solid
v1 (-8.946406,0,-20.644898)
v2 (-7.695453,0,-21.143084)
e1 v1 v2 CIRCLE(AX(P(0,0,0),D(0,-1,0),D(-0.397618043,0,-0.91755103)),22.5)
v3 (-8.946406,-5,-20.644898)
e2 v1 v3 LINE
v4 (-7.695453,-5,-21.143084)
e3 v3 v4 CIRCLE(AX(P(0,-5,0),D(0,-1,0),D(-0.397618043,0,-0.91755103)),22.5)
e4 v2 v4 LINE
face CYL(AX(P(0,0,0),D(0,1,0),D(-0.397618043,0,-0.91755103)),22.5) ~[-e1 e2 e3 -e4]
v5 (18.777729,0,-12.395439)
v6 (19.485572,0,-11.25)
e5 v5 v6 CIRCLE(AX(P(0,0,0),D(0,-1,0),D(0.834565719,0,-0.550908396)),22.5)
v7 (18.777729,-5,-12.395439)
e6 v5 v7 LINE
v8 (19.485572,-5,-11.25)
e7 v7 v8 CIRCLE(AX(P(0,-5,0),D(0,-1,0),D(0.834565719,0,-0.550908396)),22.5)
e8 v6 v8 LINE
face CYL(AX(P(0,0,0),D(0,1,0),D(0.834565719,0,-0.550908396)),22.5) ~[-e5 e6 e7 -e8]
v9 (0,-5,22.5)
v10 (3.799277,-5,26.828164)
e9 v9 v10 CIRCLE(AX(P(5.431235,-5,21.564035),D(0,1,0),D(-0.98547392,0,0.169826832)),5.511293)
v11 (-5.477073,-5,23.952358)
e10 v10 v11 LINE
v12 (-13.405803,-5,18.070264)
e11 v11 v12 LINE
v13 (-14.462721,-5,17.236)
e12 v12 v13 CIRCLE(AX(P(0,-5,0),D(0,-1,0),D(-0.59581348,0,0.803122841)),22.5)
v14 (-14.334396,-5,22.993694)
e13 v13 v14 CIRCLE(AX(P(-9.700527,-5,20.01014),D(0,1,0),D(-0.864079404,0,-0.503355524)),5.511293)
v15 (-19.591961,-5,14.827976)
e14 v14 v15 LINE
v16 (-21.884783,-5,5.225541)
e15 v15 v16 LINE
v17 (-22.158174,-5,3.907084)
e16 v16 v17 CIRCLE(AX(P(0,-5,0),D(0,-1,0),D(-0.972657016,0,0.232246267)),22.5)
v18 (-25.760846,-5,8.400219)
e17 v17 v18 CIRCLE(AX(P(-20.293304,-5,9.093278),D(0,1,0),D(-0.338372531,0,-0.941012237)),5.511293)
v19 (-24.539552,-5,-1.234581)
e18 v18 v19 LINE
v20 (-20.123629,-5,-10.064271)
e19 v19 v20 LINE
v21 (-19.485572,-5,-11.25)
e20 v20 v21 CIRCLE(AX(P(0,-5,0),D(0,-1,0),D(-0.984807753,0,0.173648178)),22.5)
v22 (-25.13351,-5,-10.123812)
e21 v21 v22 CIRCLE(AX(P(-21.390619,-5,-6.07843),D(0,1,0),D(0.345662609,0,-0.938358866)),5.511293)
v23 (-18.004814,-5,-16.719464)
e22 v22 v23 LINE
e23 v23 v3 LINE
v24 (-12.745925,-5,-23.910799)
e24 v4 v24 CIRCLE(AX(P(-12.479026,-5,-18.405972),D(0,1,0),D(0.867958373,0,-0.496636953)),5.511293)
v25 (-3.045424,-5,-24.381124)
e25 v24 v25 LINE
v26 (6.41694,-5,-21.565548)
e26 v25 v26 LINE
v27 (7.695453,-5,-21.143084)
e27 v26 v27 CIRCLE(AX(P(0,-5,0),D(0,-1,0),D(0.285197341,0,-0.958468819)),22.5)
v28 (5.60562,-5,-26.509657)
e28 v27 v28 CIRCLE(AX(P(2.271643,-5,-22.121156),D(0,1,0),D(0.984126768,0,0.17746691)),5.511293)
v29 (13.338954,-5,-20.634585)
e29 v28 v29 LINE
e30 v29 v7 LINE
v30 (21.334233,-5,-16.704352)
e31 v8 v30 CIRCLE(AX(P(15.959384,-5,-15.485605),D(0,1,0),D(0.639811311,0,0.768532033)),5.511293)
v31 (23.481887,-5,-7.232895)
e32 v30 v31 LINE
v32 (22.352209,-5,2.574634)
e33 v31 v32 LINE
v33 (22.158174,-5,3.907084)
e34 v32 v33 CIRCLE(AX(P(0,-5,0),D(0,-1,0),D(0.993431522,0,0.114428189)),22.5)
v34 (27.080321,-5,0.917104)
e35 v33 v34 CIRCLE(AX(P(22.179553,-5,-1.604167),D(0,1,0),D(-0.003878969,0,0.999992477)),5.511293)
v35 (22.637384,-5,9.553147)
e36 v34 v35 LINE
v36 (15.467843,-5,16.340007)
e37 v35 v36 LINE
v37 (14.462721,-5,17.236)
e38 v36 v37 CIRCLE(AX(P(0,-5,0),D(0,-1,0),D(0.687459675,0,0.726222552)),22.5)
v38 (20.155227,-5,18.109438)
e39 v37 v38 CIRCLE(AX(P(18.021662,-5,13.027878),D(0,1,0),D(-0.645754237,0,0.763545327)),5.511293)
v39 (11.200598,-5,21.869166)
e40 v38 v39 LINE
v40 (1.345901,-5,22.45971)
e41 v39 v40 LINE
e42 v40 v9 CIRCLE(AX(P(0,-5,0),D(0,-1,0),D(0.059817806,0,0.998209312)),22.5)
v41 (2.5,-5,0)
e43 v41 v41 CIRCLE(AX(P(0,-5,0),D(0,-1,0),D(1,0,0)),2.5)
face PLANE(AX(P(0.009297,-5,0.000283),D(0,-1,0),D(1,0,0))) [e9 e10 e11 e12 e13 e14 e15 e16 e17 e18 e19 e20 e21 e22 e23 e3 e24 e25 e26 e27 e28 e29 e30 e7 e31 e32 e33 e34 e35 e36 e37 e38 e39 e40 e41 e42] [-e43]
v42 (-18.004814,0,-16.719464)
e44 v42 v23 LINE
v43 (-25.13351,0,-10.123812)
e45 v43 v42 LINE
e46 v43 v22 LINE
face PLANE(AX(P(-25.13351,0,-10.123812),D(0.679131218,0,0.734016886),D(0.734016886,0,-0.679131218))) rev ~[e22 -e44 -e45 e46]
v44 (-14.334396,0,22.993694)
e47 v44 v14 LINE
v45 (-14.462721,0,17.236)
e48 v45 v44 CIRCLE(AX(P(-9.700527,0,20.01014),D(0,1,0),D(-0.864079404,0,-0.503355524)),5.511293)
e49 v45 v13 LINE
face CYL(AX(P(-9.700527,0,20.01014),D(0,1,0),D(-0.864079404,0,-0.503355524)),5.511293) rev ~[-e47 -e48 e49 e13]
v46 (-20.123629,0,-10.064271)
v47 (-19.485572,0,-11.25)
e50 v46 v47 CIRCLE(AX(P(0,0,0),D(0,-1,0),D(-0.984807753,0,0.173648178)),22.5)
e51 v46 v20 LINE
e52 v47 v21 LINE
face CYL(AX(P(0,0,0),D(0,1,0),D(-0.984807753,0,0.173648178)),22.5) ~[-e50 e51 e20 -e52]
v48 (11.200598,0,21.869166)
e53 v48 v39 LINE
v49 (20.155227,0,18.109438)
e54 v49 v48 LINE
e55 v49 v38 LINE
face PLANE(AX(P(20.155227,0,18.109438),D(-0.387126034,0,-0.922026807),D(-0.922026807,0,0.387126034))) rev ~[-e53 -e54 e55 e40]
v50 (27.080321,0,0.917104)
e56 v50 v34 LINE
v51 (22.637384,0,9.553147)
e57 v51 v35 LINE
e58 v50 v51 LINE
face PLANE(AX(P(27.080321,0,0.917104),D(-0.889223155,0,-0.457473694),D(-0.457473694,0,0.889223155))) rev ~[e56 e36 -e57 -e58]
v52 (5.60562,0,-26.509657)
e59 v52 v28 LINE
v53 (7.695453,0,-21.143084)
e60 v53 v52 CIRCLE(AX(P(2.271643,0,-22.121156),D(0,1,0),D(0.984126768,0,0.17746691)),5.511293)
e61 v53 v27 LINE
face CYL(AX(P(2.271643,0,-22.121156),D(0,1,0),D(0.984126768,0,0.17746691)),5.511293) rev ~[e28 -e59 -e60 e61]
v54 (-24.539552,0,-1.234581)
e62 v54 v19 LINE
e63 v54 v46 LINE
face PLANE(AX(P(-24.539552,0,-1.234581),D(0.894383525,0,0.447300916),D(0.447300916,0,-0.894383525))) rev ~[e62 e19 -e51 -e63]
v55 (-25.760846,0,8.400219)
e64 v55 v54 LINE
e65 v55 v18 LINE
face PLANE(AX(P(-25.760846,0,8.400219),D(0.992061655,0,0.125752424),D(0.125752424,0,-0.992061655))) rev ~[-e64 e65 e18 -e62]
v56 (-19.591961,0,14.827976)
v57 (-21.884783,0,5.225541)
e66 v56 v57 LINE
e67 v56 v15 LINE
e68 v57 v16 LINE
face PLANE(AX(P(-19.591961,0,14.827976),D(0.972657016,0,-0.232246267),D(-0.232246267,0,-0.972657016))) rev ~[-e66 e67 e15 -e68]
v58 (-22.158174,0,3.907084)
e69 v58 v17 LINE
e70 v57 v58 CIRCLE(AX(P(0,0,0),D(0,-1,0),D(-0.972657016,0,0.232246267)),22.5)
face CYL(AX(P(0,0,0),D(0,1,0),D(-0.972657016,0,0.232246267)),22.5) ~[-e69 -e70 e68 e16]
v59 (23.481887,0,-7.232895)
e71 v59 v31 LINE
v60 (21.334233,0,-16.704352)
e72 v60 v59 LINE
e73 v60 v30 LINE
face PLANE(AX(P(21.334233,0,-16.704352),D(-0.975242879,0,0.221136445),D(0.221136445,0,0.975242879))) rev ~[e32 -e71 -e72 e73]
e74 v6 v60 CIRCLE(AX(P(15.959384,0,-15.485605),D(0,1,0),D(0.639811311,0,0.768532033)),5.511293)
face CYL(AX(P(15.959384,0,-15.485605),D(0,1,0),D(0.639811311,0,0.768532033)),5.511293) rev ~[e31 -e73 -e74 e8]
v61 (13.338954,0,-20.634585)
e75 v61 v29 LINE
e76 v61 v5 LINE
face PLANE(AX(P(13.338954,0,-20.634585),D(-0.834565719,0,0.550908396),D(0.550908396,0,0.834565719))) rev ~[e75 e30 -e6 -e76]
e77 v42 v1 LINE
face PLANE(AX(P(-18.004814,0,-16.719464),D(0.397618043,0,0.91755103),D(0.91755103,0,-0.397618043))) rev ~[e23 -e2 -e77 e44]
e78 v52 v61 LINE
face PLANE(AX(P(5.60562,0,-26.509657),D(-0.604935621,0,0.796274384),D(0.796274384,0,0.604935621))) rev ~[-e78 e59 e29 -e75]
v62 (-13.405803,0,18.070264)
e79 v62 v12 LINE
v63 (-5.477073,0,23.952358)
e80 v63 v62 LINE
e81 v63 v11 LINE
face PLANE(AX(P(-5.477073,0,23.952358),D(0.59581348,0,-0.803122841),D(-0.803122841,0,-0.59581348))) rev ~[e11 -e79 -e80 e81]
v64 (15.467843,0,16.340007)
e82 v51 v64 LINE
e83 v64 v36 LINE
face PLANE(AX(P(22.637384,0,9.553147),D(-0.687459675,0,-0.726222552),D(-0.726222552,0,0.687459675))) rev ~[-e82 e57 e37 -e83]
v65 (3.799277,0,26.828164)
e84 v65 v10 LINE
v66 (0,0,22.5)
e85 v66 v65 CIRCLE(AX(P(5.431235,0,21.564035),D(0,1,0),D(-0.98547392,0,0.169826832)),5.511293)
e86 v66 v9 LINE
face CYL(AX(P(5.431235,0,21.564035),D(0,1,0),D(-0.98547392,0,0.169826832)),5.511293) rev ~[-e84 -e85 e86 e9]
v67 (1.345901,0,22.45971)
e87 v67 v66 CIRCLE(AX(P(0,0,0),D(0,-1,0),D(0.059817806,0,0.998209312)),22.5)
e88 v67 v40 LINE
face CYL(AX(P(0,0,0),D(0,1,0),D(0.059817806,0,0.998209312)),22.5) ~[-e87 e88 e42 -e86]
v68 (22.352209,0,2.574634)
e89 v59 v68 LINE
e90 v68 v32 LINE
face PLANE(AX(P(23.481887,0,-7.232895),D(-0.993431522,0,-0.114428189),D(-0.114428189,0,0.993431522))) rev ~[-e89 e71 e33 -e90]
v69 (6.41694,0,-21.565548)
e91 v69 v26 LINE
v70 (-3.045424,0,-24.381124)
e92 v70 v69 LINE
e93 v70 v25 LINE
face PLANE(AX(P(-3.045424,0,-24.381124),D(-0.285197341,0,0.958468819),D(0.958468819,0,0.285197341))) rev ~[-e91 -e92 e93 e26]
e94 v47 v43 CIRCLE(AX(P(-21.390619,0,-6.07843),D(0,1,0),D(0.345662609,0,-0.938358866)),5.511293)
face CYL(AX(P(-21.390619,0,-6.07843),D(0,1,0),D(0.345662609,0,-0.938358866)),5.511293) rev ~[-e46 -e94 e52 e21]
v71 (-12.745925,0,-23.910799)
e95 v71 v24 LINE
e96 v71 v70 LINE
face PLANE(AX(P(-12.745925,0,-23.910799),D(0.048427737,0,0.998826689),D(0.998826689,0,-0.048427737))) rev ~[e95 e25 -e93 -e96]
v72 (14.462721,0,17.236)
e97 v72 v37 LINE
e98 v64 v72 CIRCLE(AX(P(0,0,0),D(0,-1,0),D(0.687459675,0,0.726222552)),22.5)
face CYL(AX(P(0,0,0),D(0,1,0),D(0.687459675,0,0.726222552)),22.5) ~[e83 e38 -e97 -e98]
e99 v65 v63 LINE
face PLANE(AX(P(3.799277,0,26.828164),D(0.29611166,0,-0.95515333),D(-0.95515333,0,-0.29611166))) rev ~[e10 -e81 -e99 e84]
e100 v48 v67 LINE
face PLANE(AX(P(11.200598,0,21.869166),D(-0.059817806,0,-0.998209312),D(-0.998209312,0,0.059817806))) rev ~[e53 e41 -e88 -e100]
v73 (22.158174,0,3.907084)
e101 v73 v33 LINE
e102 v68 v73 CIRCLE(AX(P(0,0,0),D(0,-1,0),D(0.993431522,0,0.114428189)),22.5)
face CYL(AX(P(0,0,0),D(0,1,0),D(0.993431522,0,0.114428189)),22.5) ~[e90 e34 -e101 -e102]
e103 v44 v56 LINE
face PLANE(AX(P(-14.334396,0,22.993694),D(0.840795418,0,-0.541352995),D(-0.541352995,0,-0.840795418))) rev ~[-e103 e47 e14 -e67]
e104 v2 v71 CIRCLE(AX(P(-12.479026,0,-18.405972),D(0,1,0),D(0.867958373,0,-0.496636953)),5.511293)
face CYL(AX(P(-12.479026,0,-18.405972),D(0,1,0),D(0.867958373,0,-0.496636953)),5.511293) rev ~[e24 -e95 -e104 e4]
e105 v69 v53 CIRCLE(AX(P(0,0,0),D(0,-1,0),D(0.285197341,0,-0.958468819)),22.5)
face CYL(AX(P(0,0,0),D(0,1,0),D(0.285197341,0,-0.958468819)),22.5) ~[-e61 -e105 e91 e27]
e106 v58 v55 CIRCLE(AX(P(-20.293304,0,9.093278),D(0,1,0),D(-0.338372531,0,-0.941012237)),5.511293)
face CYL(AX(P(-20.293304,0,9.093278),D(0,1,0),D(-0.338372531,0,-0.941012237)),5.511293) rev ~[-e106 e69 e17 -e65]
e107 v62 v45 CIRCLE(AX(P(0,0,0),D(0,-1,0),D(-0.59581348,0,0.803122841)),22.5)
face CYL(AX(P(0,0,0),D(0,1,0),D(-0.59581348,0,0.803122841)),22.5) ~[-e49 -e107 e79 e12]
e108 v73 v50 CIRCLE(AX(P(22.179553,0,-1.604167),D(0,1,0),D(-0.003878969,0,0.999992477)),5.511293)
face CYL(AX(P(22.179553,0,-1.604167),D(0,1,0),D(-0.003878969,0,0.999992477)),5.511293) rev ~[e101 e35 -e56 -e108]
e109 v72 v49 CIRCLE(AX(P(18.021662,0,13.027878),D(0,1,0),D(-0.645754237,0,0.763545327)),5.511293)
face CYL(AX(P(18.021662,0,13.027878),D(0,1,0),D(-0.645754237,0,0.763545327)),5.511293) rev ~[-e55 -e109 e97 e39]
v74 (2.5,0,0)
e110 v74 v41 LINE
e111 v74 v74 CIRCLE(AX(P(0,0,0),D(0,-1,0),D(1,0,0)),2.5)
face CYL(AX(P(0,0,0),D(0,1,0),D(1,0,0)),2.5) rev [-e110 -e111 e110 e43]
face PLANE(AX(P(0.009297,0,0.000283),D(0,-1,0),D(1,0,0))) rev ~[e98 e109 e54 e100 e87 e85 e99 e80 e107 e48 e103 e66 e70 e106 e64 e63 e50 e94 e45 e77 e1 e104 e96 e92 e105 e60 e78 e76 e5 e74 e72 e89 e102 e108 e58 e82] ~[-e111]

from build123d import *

# Parameters (mm, degrees)
F0_R     = 2.5
F1_DEPTH = 5


# Not quite as in the source:
# - a feature names something its author has since deleted; it is built from what else it names


with BuildPart() as f1:
    # F0 (on Front) → F1 (new body)
    with BuildSketch(Plane.XZ):
        with BuildLine():
            ThreePointArc((19.4855715851, -11.25), (21.7333310915, -5.8234285148), (22.5, 0))
            ThreePointArc((22.5, 0), (22.4630219271, 1.2894362728), (22.3522092532, 2.5746342462))
            ThreePointArc((22.3522092532, 2.5746342462), (22.2651615708, 3.2423109389), (22.1581744428, 3.9070839975))
            ThreePointArc((22.1581744428, 3.9070839975), (19.8134723767, 10.6619094152), (15.4678426969, 16.3400074145))
            ThreePointArc((15.4678426969, 16.3400074145), (14.9719859982, 16.795524263), (14.4627212179, 17.2359999702))
            ThreePointArc((14.4627212179, 17.2359999702), (8.3246571453, 20.9033510092), (1.3459006368, 22.4597095145))
            ThreePointArc((1.3459006368, 22.4597095145), (0.6732517819, 22.489925123), (0, 22.5))
            ThreePointArc((0, 22.5), (-7.0593576826, 21.363882351), (-13.4058032893, 18.0702639208))
            ThreePointArc((-13.4058032893, 18.0702639208), (-13.9405044255, 17.6610400702), (-14.4627212179, 17.2359999702))
            ThreePointArc((-14.4627212179, 17.2359999702), (-19.1402205948, 11.8280157078), (-21.8847828674, 5.22554101))
            ThreePointArc((-21.8847828674, 5.22554101), (-22.0313436808, 4.568358088), (-22.1581744428, 3.9070839975))
            ThreePointArc((-22.1581744428, 3.9070839975), (-22.2651615708, -3.2423109389), (-20.1236293196, -10.0642706148))
            ThreePointArc((-20.1236293196, -10.0642706148), (-19.8134723767, -10.6619094152), (-19.4855715851, -11.25))
            ThreePointArc((-19.4855715851, -11.25), (-14.9719859982, -16.795524263), (-8.9464059639, -20.6448981671))
            ThreePointArc((-8.9464059639, -20.6448981671), (-8.3246571453, -20.9033510092), (-7.6954532248, -21.1430839677))
            ThreePointArc((-7.6954532248, -21.1430839677), (-0.6732517819, -22.489925123), (6.4169401705, -21.5655484245))
            ThreePointArc((6.4169401705, -21.5655484245), (7.0593576826, -21.363882351), (7.6954532248, -21.1430839677))
            ThreePointArc((7.6954532248, -21.1430839677), (13.9405044255, -17.6610400702), (18.7777286828, -12.3954388997))
            ThreePointArc((18.7777286828, -12.3954388997), (19.1402205948, -11.8280157078), (19.4855715851, -11.25))
        make_face()
        Circle(F0_R, mode=Mode.SUBTRACT)
        with BuildLine():
            ThreePointArc((-13.4058032893, 18.0702639208), (-7.0593576826, 21.363882351), (0, 22.5))
            ThreePointArc((0, 22.5), (1.2893242582, 25.1998179584), (3.7992770591, 26.8281640483))
            Line((3.7992770591, 26.8281640483), (-5.477073051, 23.9523583039))
            Line((-5.477073051, 23.9523583039), (-13.4058032893, 18.0702639208))
        make_face()
        with BuildLine():
            ThreePointArc((-21.8847828674, 5.22554101), (-19.1402205948, 11.8280157078), (-14.4627212179, 17.2359999702))
            ThreePointArc((-14.4627212179, 17.2359999702), (-15.2104510666, 20.1329421727), (-14.3343963619, 22.9936942077))
            Line((-14.3343963619, 22.9936942077), (-19.5919605158, 14.8279762838))
            Line((-19.5919605158, 14.8279762838), (-21.8847828674, 5.22554101))
        make_face()
        with BuildLine():
            Line((-24.5395519148, -1.2345806341), (-20.1236293196, -10.0642706148))
            ThreePointArc((-20.1236293196, -10.0642706148), (-22.2651615708, -3.2423109389), (-22.1581744428, 3.9070839975))
            ThreePointArc((-22.1581744428, 3.9070839975), (-24.5930872921, 5.6456389916), (-25.7608464161, 8.4002193008))
            Line((-25.7608464161, 8.4002193008), (-24.5395519148, -1.2345806341))
        make_face()
        with BuildLine():
            Line((-18.0048142462, -16.7194635525), (-8.9464059639, -20.6448981671))
            ThreePointArc((-8.9464059639, -20.6448981671), (-14.9719859982, -16.795524263), (-19.4855715851, -11.25))
            ThreePointArc((-19.4855715851, -11.25), (-22.4683446518, -11.4833214179), (-25.1335101323, -10.1238115749))
            Line((-25.1335101323, -10.1238115749), (-18.0048142462, -16.7194635525))
        make_face()
        with BuildLine():
            Line((-3.0454238906, -24.3811236585), (6.4169401705, -21.5655484245))
            ThreePointArc((6.4169401705, -21.5655484245), (-0.6732517819, -22.489925123), (-7.6954532248, -21.1430839677))
            ThreePointArc((-7.6954532248, -21.1430839677), (-9.8304138412, -23.2391081131), (-12.7459251298, -23.9107985011))
            Line((-12.7459251298, -23.9107985011), (-3.0454238906, -24.3811236585))
        make_face()
        with BuildLine():
            ThreePointArc((22.3522092532, 2.5746342462), (22.4630219271, 1.2894362728), (22.5, 0))
            ThreePointArc((22.5, 0), (21.7333310915, -5.8234285148), (19.4855715851, -11.25))
            ThreePointArc((19.4855715851, -11.25), (21.1790203936, -13.7164965405), (21.3342330732, -16.7043524734))
            Line((21.3342330732, -16.7043524734), (23.4818872972, -7.2328947514))
            Line((23.4818872972, -7.2328947514), (22.3522092532, 2.5746342462))
        make_face()
        with BuildLine():
            Line((13.3389541496, -20.6345850387), (18.7777286828, -12.3954388997))
            ThreePointArc((18.7777286828, -12.3954388997), (13.9405044255, -17.6610400702), (7.6954532248, -21.1430839677))
            ThreePointArc((7.6954532248, -21.1430839677), (7.4072768587, -24.1210578483), (5.6056198962, -26.5096570697))
            Line((5.6056198962, -26.5096570697), (13.3389541496, -20.6345850387))
        make_face()
        with BuildLine():
            ThreePointArc((1.3459006368, 22.4597095145), (8.3246571453, 20.9033510092), (14.4627212179, 17.2359999702))
            ThreePointArc((14.4627212179, 17.2359999702), (17.1858104334, 18.4754188566), (20.1552265199, 18.1094377689))
            Line((20.1552265199, 18.1094377689), (11.2005977653, 21.8691656728))
            Line((11.2005977653, 21.8691656728), (1.3459006368, 22.4597095145))
        make_face()
        with BuildLine():
            ThreePointArc((15.4678426969, 16.3400074145), (19.8134723767, 10.6619094152), (22.1581744428, 3.9070839975))
            ThreePointArc((22.1581744428, 3.9070839975), (25.0408649078, 3.1061659404), (27.0803214916, 0.9171042935))
            Line((27.0803214916, 0.9171042935), (22.6373844064, 9.5531473747))
            Line((22.6373844064, 9.5531473747), (15.4678426969, 16.3400074145))
        make_face()
    extrude(amount=F1_DEPTH)


solid = f1.part
